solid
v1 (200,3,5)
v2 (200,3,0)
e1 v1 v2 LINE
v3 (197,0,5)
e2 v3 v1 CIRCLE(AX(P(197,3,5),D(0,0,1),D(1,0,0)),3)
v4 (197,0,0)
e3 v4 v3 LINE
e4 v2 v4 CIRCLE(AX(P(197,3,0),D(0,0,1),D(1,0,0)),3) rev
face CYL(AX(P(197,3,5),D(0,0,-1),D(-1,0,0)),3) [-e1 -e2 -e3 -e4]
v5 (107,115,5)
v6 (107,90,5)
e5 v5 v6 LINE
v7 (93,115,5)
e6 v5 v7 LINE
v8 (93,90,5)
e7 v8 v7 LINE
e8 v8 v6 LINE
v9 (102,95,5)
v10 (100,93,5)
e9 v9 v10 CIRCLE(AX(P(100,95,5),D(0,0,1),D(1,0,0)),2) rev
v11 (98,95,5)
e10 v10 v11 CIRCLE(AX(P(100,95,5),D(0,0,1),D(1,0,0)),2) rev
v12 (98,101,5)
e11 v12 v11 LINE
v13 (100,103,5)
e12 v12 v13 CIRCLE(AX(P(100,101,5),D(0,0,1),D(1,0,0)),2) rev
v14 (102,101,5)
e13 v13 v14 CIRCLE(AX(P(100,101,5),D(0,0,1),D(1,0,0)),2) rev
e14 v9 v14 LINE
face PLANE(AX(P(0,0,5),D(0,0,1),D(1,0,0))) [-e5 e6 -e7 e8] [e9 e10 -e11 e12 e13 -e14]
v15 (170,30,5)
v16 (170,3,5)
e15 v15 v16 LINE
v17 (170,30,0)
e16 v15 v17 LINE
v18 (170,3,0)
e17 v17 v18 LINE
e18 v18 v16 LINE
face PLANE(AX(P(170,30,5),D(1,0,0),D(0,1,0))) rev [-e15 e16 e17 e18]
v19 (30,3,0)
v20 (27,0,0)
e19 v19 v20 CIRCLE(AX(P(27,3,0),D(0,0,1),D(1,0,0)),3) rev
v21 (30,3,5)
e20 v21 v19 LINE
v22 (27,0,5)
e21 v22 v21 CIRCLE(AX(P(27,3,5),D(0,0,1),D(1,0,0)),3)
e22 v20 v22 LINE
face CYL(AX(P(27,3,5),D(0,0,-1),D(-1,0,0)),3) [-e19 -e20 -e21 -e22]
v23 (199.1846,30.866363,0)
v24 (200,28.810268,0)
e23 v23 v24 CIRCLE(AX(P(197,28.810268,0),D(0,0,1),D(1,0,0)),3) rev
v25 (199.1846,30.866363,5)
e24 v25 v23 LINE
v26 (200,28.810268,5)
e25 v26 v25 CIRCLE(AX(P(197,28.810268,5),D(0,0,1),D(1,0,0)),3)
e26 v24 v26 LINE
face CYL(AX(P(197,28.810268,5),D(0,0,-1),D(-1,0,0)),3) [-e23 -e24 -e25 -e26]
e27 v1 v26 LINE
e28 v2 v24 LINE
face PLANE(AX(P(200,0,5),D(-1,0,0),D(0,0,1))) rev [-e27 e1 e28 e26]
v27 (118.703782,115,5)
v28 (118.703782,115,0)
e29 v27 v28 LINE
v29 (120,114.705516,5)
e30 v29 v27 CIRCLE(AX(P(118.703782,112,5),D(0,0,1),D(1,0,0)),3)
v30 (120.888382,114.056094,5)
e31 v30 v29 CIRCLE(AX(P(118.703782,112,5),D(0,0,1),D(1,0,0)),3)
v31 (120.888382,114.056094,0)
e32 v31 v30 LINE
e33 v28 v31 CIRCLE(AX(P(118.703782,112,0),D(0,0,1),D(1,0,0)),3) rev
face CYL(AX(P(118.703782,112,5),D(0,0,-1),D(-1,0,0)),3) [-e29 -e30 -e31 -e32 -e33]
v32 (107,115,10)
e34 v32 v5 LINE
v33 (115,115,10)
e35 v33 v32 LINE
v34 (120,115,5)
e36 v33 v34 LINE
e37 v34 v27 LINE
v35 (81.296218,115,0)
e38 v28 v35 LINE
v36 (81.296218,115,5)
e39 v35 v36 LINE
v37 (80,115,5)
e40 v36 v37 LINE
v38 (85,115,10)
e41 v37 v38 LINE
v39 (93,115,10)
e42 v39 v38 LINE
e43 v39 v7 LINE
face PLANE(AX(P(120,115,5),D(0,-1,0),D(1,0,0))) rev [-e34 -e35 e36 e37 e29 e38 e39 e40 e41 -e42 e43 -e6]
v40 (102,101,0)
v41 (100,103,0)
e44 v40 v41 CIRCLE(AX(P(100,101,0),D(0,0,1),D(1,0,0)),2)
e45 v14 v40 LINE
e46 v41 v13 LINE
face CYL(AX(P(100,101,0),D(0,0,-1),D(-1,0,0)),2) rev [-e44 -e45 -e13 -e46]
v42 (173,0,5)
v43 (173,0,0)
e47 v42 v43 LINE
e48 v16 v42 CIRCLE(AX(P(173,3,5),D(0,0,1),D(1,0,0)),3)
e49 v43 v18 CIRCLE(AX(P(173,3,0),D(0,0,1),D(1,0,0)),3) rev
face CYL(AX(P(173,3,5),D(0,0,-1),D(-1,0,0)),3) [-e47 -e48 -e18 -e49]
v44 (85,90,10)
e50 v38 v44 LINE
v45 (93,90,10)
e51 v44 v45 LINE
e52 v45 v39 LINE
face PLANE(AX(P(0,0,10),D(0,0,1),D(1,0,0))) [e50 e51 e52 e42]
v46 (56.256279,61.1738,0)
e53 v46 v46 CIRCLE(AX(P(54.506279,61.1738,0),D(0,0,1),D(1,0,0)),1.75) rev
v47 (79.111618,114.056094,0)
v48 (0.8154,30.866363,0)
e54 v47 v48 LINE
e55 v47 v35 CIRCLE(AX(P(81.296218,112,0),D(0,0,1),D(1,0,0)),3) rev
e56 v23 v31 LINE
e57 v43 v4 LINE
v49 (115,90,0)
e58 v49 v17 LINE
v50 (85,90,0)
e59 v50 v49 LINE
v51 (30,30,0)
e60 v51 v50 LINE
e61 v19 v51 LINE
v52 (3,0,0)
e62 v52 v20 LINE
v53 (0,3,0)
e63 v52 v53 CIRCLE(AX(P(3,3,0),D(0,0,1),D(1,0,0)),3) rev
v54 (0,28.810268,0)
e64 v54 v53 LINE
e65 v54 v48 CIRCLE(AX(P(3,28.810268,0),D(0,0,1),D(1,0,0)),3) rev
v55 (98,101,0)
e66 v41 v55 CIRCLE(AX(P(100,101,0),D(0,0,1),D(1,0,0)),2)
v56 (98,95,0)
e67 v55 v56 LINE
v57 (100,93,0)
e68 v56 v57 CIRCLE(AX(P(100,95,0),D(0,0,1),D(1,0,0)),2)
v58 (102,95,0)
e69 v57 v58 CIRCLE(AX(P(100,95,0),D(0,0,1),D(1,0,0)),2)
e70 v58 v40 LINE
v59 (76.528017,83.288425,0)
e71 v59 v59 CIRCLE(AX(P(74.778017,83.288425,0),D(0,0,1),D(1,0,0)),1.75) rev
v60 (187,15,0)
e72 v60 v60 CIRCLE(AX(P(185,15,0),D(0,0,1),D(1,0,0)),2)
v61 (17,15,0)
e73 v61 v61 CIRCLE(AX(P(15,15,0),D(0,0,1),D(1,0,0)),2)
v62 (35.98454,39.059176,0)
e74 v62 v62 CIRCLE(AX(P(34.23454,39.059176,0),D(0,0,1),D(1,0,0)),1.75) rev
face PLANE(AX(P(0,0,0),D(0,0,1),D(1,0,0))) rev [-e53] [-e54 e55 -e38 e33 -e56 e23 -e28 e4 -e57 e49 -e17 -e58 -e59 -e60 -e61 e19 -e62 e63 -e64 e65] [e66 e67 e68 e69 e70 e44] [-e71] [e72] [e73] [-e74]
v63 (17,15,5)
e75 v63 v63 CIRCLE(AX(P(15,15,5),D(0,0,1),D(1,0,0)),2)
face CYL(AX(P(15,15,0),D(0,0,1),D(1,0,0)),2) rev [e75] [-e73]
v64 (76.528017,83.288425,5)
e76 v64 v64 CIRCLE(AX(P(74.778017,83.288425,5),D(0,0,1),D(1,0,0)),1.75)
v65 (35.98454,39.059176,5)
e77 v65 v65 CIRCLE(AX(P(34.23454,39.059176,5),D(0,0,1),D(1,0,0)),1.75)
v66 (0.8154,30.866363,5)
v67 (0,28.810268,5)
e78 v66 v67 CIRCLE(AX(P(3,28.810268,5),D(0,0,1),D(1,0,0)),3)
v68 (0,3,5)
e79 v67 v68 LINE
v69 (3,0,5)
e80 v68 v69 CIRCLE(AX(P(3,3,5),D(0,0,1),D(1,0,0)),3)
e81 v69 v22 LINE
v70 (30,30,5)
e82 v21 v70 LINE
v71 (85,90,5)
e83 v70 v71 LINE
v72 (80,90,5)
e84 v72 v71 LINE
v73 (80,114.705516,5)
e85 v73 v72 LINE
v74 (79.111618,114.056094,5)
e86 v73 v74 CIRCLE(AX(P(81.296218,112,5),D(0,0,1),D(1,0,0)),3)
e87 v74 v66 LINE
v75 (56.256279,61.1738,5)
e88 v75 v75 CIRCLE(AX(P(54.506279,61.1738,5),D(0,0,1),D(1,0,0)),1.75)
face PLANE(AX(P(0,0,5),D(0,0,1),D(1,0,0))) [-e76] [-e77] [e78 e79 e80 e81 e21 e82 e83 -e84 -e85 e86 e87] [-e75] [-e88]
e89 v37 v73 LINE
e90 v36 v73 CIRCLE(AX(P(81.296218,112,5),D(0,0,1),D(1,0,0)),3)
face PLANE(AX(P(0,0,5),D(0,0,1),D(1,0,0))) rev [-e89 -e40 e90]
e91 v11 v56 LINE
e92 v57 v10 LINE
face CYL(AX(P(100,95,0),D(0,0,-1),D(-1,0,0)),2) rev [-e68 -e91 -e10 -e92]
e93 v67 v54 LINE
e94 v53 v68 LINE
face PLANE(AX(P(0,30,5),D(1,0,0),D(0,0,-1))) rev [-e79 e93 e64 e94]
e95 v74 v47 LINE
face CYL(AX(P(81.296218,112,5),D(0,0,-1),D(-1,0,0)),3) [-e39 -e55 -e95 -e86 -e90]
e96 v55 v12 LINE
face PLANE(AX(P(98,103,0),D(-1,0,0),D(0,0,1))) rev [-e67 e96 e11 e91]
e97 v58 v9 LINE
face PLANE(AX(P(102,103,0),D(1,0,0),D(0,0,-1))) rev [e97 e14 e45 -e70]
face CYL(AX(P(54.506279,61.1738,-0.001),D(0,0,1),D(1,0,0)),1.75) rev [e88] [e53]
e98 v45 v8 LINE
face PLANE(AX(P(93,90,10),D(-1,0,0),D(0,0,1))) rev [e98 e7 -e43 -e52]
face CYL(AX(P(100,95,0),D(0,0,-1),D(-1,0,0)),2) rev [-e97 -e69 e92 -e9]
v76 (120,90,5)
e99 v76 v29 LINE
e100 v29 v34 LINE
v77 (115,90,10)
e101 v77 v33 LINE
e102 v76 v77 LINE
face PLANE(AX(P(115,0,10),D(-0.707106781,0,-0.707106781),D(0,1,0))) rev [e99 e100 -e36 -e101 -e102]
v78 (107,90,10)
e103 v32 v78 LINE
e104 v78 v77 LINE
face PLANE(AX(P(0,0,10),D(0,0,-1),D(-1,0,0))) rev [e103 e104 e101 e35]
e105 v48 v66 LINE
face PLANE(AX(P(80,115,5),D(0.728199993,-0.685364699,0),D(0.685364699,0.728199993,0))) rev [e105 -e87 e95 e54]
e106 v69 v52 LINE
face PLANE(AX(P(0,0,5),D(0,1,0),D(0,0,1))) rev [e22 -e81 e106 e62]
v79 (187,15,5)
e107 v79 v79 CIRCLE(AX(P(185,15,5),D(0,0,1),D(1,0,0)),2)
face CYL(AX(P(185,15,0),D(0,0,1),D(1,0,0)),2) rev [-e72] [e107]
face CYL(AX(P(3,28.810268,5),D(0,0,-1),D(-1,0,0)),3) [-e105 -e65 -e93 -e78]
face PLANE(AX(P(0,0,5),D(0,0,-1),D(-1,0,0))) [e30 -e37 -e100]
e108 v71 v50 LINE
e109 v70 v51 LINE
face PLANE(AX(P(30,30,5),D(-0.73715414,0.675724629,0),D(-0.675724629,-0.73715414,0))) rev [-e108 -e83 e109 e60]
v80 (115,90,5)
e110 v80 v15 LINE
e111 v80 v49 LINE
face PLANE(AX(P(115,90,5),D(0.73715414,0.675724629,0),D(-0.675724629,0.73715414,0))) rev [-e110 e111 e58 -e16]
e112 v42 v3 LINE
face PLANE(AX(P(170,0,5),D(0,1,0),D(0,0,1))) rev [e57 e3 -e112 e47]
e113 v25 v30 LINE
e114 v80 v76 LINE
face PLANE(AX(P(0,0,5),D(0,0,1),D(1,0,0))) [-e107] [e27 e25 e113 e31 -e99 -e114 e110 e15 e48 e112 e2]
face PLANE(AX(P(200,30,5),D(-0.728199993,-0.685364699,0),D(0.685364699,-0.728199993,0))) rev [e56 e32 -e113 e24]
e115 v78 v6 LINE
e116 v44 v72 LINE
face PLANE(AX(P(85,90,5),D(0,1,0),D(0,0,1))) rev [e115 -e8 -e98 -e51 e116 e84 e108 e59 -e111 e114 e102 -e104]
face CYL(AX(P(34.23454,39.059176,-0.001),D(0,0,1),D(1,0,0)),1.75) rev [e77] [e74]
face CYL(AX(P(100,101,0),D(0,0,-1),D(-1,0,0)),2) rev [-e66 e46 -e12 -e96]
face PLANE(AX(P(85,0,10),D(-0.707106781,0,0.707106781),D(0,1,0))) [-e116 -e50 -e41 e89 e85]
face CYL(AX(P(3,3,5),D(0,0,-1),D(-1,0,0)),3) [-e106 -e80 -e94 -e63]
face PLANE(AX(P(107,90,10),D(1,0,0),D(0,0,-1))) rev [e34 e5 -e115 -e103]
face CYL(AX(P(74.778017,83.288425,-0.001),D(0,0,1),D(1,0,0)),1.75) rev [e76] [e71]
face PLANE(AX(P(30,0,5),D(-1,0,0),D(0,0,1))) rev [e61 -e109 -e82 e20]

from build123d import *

# Parameters (mm, degrees)
DODANIE_WYCI_GNI_CIE1_DEPTH = 5
SZKIC3_R                    = 2
WYTNIJ_WYCI_GNI_CIE1_DEPTH  = 5
SZKIC4_W                    = 4
SZKIC4_H                    = 10
WYTNIJ_WYCI_GNI_CIE2_DEPTH  = 5
ZAOKR_GLENIE1_R             = 3
ZAOKR_GLENIE2_R             = 2
SZKIC5_W                    = 13
SZKIC5_H                    = 25
DODANIE_WYCI_GNI_CIE2_DEPTH = 5
SFAZOWANIE1_SIZE            = 5
WYTNIJ_WYCI_GNI_CIE3_REACH  = 232.76
SZKIC6_R                    = 1.75


with BuildPart() as part:
    # Szkic2 → Dodanie-wyciągnięcie1 (new body)
    with BuildSketch(Plane.XY):
        Polygon((0, 0), (30, 0), (30, 30), (85, 90), (115, 90), (170, 30), (170, 0), (200, 0), (200, 30), (120, 115), (80, 115), (0, 30), align=None)
    extrude(amount=DODANIE_WYCI_GNI_CIE1_DEPTH)

    # Szkic3 → Wytnij-wyciągnięcie1 (cut)
    with BuildSketch(Plane.XY.offset(5)):
        with Locations((15, 15)):
            Circle(SZKIC3_R)
        with Locations((185, 15)):
            Circle(SZKIC3_R)
    extrude(amount=-WYTNIJ_WYCI_GNI_CIE1_DEPTH, mode=Mode.SUBTRACT)

    # Szkic4 → Wytnij-wyciągnięcie2 (cut)
    with BuildSketch(Plane.XY.offset(5)):
        with Locations((100, 98)):
            Rectangle(SZKIC4_W, SZKIC4_H)
    extrude(amount=-WYTNIJ_WYCI_GNI_CIE2_DEPTH, mode=Mode.SUBTRACT)

    # Zaokrąglenie1
    zaokr_glenie1_edges = [part.edges().sort_by_distance(p)[0] for p in [
        (0, 30, 2.5),
        (80, 115, 2.5),
        (120, 115, 2.5),
        (200, 30, 2.5),
        (200, 0, 2.5),
        (170, 0, 2.5),
        (30, 0, 2.5),
        (0, 0, 2.5),
    ]]
    fillet(zaokr_glenie1_edges, radius=ZAOKR_GLENIE1_R)

    # Zaokrąglenie2
    zaokr_glenie2_edges = [part.edges().sort_by_distance(p)[0] for p in [
        (98, 103, 2.5),
        (102, 103, 2.5),
        (102, 93, 2.5),
        (98, 93, 2.5),
    ]]
    fillet(zaokr_glenie2_edges, radius=ZAOKR_GLENIE2_R - 0.0001)  # a hair under: the kernel refuses the full size

    # Szkic5 → Dodanie-wyciągnięcie2 (add)
    with BuildSketch(Plane.XY.offset(5)):
        with Locations((113.5, 102.5)):
            Rectangle(SZKIC5_W, SZKIC5_H)
        with Locations((86.5, 102.5)):
            Rectangle(SZKIC5_W, SZKIC5_H)
    extrude(amount=DODANIE_WYCI_GNI_CIE2_DEPTH)

    # Sfazowanie1
    sfazowanie1_edges = [part.edges().sort_by_distance(p)[0] for p in [
        (80, 102.5, 10),
        (120, 102.5, 10),
    ]]
    chamfer(sfazowanie1_edges, length=SFAZOWANIE1_SIZE - 0.0001)  # a hair under: the kernel refuses the full size

    # Szkic6 → Wytnij-wyciągnięcie3 (cut, up to next)
    with BuildSketch(Plane.XY.offset(5), mode=Mode.PRIVATE) as wytnij_wyci_gni_cie3_sk1:
        with Locations((74.778017415, 83.288424616)):
            Circle(SZKIC6_R)
    wytnij_wyci_gni_cie3_tool1 = extrude(wytnij_wyci_gni_cie3_sk1.sketch, amount=-WYTNIJ_WYCI_GNI_CIE3_REACH, mode=Mode.PRIVATE) & part.part
    # Szkic6 → Wytnij-wyciągnięcie3 (cut, up to next)
    with BuildSketch(Plane.XY.offset(5), mode=Mode.PRIVATE) as wytnij_wyci_gni_cie3_sk2:
        with Locations((34.234539704, 39.059176204)):
            Circle(SZKIC6_R)
    wytnij_wyci_gni_cie3_tool2 = extrude(wytnij_wyci_gni_cie3_sk2.sketch, amount=-WYTNIJ_WYCI_GNI_CIE3_REACH, mode=Mode.PRIVATE) & part.part
    # Szkic6 → Wytnij-wyciągnięcie3 (cut, up to next)
    with BuildSketch(Plane.XY.offset(5), mode=Mode.PRIVATE) as wytnij_wyci_gni_cie3_sk3:
        with Locations((54.50627856, 61.17380041)):
            Circle(SZKIC6_R)
    wytnij_wyci_gni_cie3_tool3 = extrude(wytnij_wyci_gni_cie3_sk3.sketch, amount=-WYTNIJ_WYCI_GNI_CIE3_REACH, mode=Mode.PRIVATE) & part.part
    add(wytnij_wyci_gni_cie3_tool1.solids().sort_by_distance((74.778017, 83.288425, 5))[0], mode=Mode.SUBTRACT)
    add(wytnij_wyci_gni_cie3_tool2.solids().sort_by_distance((34.23454, 39.059176, 5))[0], mode=Mode.SUBTRACT)
    add(wytnij_wyci_gni_cie3_tool3.solids().sort_by_distance((54.506279, 61.1738, 5))[0], mode=Mode.SUBTRACT)


solid = part.part
